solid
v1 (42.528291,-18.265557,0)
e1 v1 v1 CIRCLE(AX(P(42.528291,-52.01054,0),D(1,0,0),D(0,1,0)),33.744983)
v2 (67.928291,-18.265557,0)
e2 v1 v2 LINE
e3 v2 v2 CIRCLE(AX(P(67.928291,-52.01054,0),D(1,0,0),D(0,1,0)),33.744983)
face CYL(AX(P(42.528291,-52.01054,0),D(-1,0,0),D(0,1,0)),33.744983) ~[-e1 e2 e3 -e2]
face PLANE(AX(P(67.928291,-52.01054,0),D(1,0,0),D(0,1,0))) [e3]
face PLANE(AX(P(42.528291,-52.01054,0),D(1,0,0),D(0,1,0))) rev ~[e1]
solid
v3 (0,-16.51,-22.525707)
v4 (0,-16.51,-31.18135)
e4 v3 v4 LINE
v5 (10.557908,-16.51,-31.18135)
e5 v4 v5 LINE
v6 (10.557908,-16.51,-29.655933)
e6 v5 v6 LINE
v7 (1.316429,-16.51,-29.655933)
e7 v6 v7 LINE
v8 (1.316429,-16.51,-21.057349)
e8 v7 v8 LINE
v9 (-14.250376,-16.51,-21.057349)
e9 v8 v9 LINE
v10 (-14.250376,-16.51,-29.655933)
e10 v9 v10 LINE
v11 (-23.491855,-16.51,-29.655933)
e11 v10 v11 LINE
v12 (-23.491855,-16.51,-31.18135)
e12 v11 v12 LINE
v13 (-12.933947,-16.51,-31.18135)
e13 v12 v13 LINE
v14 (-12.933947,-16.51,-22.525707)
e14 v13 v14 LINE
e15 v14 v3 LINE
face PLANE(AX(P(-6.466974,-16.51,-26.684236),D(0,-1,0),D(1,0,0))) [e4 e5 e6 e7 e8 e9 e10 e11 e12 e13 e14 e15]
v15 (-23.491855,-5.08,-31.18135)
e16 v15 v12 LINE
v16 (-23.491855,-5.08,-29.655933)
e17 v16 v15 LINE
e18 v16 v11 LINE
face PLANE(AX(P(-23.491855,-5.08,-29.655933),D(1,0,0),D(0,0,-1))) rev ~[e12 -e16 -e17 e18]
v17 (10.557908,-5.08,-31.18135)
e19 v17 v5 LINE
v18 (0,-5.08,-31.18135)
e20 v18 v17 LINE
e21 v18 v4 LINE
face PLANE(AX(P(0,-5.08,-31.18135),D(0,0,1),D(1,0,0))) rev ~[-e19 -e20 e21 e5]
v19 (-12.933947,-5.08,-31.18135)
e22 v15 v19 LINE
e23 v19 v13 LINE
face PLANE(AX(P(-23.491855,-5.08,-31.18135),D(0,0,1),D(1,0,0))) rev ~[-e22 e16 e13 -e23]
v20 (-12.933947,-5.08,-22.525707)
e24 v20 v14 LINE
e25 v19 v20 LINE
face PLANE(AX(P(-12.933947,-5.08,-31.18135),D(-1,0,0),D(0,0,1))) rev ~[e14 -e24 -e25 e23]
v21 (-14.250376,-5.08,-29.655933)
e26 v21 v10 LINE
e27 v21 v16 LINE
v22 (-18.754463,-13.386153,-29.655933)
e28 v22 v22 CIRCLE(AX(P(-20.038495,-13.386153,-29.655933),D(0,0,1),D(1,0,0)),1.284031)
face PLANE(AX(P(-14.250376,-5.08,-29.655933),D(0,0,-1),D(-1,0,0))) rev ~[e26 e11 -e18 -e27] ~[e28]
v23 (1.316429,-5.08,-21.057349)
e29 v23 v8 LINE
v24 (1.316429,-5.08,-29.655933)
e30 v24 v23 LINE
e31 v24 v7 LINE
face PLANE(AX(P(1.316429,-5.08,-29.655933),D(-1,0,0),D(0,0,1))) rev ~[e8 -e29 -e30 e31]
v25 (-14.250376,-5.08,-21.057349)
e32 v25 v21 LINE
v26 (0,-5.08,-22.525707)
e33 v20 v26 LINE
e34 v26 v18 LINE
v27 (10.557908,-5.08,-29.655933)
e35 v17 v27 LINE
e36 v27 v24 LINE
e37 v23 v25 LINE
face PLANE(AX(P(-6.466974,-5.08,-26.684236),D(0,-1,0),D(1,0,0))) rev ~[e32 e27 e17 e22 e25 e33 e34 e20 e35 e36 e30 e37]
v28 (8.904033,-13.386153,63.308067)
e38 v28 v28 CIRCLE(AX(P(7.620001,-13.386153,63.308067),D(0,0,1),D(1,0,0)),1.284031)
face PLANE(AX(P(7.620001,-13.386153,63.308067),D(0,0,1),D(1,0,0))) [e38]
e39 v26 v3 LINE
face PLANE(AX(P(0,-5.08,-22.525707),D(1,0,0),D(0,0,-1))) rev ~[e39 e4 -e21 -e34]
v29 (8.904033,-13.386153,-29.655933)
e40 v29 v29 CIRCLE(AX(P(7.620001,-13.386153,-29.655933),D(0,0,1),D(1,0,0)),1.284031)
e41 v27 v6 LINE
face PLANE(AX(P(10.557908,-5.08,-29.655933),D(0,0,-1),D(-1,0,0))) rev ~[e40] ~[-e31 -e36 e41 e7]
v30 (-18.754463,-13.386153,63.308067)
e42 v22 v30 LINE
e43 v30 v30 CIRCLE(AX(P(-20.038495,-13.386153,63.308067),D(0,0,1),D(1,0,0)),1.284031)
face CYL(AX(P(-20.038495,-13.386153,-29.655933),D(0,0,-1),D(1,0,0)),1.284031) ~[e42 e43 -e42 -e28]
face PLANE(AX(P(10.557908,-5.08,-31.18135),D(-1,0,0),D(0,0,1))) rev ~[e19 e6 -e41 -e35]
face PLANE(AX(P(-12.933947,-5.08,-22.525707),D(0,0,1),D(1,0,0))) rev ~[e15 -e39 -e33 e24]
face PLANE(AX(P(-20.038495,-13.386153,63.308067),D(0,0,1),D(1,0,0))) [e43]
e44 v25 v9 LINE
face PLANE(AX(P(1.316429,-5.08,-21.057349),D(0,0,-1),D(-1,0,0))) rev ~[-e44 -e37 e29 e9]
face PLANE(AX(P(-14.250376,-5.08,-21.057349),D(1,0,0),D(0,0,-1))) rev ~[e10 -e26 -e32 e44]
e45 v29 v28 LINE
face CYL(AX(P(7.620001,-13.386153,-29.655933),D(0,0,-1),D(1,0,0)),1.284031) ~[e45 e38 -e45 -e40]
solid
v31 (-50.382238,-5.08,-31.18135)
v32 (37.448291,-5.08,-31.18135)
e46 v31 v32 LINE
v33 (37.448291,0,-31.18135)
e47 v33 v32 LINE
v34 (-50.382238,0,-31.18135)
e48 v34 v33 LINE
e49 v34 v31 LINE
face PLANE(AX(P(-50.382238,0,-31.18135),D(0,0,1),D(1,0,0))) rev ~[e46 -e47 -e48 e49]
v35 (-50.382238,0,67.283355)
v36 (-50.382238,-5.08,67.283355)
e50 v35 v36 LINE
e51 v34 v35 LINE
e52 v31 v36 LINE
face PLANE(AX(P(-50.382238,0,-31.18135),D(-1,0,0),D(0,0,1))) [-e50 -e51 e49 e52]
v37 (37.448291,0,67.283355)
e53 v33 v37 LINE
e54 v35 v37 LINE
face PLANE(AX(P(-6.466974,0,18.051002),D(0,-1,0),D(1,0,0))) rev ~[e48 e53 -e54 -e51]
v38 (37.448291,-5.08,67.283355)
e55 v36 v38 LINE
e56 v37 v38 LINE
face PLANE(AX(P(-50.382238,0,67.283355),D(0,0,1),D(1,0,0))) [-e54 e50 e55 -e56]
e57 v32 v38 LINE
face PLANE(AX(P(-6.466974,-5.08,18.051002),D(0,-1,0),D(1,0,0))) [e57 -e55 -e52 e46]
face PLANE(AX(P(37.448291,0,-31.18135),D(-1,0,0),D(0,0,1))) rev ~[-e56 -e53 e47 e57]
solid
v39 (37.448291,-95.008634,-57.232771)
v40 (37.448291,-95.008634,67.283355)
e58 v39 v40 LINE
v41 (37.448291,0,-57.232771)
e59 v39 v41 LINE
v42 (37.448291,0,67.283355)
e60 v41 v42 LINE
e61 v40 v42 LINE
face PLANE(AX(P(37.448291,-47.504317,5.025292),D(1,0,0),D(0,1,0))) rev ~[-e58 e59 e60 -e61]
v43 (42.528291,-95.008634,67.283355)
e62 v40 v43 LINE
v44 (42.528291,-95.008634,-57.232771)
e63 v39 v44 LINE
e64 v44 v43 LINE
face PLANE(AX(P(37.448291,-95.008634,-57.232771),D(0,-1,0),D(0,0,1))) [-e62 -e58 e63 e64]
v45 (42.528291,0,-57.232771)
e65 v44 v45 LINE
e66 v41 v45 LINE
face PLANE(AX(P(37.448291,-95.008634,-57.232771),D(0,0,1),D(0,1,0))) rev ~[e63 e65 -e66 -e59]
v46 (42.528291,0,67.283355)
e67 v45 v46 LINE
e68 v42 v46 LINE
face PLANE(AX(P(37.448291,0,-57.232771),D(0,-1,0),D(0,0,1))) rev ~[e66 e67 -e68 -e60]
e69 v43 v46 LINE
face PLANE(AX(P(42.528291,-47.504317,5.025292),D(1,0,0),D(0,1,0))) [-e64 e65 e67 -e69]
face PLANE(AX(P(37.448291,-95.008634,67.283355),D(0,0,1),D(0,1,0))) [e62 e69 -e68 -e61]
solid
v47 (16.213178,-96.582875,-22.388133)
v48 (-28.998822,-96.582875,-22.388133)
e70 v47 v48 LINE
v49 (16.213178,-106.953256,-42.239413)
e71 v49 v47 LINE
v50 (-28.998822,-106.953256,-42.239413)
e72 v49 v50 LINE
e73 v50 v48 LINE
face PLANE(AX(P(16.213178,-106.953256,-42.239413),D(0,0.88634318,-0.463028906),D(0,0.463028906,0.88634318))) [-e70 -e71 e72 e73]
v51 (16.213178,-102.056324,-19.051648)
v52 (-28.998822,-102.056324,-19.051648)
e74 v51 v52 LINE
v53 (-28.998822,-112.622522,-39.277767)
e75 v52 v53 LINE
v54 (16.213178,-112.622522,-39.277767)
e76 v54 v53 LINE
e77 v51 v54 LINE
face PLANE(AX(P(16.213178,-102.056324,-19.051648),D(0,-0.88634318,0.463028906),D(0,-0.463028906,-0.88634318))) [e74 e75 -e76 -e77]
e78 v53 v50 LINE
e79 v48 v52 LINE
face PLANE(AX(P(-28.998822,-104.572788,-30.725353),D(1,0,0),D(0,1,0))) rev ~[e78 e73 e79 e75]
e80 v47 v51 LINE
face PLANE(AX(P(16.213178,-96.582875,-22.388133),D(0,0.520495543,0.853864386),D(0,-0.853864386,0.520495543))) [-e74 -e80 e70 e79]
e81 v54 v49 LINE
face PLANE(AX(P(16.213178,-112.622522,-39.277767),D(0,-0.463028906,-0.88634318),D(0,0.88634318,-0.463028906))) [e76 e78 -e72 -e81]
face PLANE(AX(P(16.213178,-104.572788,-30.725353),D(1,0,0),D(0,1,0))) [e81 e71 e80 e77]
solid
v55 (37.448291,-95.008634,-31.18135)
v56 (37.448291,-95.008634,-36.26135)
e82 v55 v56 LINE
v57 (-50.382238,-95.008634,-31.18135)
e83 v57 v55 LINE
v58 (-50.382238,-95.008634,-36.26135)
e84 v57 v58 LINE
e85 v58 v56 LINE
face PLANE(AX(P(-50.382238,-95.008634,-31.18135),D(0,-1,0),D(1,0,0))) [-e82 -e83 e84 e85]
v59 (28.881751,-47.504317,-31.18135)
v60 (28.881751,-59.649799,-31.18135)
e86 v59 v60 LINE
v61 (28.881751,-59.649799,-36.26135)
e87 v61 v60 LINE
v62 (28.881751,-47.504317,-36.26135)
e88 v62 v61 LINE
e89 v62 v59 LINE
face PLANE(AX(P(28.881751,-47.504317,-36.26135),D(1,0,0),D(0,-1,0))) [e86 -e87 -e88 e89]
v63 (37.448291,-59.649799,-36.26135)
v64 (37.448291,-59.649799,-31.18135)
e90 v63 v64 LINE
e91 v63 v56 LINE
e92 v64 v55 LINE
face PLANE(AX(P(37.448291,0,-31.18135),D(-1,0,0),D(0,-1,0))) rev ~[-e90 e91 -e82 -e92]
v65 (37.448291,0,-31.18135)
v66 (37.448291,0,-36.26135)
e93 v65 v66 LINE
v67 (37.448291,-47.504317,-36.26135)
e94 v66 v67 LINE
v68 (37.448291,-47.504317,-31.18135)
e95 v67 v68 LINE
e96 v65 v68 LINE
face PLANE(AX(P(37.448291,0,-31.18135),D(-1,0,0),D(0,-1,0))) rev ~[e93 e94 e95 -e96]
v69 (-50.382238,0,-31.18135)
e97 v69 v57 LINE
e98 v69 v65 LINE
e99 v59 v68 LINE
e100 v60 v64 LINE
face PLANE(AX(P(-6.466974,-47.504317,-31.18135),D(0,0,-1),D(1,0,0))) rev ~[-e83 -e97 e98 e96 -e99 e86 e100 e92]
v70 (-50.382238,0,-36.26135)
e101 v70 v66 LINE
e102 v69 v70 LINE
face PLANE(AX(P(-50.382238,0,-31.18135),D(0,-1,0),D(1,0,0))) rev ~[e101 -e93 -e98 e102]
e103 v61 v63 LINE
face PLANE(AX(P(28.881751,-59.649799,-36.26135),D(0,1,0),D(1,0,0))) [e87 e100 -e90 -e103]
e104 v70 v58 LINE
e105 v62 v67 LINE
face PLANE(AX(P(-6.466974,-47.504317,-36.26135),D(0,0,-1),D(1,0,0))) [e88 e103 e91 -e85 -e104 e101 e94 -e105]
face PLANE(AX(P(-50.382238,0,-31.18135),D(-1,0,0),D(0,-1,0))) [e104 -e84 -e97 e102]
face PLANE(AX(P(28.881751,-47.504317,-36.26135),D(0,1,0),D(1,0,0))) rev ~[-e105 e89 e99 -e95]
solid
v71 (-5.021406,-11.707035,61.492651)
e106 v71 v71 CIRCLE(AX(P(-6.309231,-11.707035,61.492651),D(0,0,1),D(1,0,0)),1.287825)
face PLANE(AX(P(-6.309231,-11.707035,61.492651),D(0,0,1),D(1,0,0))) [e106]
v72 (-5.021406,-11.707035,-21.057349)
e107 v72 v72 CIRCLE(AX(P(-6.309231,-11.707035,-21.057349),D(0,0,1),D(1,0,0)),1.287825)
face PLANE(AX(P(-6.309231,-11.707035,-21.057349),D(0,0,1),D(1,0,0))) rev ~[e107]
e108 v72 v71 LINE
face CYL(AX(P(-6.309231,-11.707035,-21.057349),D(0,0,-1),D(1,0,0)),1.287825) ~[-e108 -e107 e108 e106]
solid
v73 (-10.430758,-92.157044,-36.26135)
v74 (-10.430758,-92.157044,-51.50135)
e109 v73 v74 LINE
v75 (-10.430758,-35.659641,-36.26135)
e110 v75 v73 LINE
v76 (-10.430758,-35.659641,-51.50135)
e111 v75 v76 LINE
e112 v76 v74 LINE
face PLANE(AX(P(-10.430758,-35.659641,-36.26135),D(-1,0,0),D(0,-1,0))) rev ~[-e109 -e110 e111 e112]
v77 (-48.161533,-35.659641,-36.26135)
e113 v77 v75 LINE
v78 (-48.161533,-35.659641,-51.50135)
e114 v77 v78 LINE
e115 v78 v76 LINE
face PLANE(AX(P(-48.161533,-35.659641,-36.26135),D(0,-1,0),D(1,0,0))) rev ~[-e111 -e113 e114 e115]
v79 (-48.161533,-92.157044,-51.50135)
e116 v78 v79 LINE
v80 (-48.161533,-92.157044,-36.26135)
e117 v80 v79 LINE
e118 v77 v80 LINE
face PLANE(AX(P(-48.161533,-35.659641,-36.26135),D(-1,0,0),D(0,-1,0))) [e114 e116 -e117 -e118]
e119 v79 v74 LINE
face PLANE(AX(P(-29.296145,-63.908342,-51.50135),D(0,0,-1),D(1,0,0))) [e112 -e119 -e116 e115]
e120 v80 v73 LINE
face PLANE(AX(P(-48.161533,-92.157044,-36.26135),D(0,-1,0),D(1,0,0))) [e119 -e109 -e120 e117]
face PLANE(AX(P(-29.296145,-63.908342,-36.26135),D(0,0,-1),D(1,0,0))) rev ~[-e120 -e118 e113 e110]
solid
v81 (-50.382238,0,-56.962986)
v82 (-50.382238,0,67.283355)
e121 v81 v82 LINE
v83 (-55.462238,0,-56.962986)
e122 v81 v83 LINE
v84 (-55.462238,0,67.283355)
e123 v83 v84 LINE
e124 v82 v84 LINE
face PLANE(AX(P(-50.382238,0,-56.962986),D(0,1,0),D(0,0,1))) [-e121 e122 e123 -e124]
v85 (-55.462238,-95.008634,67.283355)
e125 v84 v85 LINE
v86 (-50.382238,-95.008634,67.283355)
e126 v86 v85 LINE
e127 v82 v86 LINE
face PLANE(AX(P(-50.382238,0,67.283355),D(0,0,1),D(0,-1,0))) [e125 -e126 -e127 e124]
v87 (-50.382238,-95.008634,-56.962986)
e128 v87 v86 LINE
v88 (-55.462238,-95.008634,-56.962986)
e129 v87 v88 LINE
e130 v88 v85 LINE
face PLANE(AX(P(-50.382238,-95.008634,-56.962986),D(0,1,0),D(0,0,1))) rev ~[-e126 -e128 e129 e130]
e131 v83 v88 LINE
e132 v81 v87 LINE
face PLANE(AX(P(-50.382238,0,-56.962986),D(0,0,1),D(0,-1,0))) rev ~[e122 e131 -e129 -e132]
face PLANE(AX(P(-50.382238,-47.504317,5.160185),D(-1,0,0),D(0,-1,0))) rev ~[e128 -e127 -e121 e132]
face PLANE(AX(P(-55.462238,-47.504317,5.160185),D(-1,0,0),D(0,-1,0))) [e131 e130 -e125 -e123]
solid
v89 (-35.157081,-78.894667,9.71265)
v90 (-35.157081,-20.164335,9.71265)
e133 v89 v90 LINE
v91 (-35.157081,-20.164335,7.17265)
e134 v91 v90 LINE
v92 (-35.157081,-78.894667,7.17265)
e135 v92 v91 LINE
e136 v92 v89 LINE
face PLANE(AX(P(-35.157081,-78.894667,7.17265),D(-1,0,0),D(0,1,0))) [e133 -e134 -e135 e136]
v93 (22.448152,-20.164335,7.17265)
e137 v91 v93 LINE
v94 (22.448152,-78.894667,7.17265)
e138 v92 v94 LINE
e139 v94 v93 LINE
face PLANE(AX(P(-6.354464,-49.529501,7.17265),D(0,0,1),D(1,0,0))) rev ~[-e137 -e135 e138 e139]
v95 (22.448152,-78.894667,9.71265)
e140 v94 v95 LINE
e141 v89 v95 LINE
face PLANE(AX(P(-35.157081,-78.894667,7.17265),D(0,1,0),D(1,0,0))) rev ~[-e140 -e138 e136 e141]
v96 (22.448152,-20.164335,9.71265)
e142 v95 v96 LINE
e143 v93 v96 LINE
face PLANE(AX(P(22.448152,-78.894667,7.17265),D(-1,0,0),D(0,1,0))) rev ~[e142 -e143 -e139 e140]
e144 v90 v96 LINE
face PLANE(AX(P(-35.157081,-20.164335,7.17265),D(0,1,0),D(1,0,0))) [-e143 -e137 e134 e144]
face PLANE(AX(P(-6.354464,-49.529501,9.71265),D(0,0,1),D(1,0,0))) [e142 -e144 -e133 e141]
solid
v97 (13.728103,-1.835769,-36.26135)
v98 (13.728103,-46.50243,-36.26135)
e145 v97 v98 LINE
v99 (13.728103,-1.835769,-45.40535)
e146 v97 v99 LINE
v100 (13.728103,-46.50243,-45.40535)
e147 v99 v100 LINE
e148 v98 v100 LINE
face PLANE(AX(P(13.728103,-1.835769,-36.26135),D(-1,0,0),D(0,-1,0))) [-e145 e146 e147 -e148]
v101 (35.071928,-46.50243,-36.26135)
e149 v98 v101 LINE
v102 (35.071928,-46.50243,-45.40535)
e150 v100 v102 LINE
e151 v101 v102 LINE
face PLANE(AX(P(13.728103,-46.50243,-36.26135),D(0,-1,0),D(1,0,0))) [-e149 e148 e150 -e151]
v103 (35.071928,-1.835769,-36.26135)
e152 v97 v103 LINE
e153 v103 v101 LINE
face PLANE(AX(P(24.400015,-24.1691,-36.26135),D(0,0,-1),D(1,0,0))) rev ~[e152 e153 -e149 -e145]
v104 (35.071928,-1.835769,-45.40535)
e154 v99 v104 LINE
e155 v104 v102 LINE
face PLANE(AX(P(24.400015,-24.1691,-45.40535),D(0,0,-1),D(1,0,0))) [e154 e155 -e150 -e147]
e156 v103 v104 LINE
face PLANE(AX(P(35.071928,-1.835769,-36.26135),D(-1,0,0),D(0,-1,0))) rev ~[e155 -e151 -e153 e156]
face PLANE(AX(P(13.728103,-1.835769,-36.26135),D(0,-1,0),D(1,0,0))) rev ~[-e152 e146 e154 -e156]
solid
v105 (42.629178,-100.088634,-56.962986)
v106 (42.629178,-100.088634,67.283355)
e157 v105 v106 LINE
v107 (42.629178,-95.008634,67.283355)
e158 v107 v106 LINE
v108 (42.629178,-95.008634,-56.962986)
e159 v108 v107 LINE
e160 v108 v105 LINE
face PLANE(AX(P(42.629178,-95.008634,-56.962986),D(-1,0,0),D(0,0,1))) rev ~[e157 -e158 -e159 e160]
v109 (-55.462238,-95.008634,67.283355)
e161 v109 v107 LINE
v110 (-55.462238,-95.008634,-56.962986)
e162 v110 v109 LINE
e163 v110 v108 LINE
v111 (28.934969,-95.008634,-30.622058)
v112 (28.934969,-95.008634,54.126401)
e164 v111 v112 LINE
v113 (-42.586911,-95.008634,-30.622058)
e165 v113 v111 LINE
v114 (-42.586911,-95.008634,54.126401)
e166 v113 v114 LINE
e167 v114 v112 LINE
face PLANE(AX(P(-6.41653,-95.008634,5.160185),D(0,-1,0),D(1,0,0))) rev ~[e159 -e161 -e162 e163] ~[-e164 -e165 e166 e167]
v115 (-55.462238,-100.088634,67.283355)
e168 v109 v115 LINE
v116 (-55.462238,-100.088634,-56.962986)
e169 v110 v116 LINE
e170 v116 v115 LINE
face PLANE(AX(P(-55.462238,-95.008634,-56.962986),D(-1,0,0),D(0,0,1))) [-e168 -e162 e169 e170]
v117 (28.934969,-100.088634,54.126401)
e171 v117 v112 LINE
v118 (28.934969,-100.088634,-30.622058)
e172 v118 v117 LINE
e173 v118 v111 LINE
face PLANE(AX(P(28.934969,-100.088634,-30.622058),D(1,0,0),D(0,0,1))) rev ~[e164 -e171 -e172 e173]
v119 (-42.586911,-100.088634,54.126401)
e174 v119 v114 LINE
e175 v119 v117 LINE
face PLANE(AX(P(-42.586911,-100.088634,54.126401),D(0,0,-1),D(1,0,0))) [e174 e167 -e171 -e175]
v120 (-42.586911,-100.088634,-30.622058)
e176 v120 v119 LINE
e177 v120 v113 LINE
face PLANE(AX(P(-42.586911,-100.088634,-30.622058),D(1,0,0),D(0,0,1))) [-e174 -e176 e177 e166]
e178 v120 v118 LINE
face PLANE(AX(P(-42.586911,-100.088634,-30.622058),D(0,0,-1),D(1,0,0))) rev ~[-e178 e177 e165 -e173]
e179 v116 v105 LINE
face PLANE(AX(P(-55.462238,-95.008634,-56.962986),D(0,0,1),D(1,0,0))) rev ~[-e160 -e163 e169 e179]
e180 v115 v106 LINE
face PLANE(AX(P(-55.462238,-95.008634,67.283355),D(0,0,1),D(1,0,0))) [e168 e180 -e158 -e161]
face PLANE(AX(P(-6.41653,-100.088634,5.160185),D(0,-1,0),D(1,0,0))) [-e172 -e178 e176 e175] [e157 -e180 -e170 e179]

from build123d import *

# Parameters (mm, degrees)
F0_W      = 87.8305286169
F0_H      = 98.46470505
F1_DEPTH  = 5.08
F2_W      = 87.8305286169
F2_H      = 95.0086340308
F3_DEPTH  = 5.08
F4_W      = 95.0086340308
F4_H      = 124.5161257684
F5_DEPTH  = 5.08
F6_W      = 95.0086340308
F6_H      = 124.246340245
F7_DEPTH  = 5.08
F8_W      = 98.0914154202
F8_H      = 124.246340245
F9_DEPTH  = 5.08
F10_W     = 71.5218801051
F10_H     = 84.7484581172
F11_DEPTH = 25.4
F13_DEPTH = 11.43
F15_R     = 1.2840313407
F16_DEPTH = 92.964
F14_R     = 1.287825451
F17_DEPTH = 82.55
F18_W     = 37.7307755407
F18_H     = 56.4974024892
F19_DEPTH = 15.24
F20_W     = 21.343825385
F20_H     = 44.6666606003
F21_DEPTH = 9.144
F22_W     = 8.5665397346
F22_H     = 12.1454820037
F23_DEPTH = 25.4
F25_W     = 57.6052330434
F25_H     = 58.7303321809
F26_DEPTH = 2.54
F29_DEPTH = 45.212
F30_R     = 33.7449831522
F31_DEPTH = 25.4


with BuildPart() as f1:
    # F0 (on Front) → F1 (new body)
    with BuildSketch(Plane.XZ):
        with Locations((-6.466973573, 18.0510021746)):
            Rectangle(F0_W, F0_H)
    extrude(amount=F1_DEPTH)


with BuildPart() as f3:
    # F2 (on face) → F3 (new body)
    with BuildSketch(Plane(origin=(0, 0, -31.1813503504), x_dir=(1, 0, 0), z_dir=(0, 0, -1))):
        with Locations((-6.466973573, 47.5043170154)):
            Rectangle(F2_W, F2_H)
    extrude(amount=F3_DEPTH)

    # F22 (on face) → F23 (cut)
    with BuildSketch(Plane(origin=(0, 0, -36.2613503504), x_dir=(1, 0, 0), z_dir=(0, 0, -1))):
        with Locations((33.1650208682, 53.5770580173)):
            Rectangle(F22_W, F22_H)
    extrude(amount=-F23_DEPTH, mode=Mode.SUBTRACT)


with BuildPart() as f5:
    # F4 (on face) → F5 (new body)
    with BuildSketch(Plane.YZ.offset(37.4482907355)):
        with Locations((-47.5043170154, 5.0252918154)):
            Rectangle(F4_W, F4_H)
    extrude(amount=F5_DEPTH)


with BuildPart() as f7:
    # F6 (on face) → F7 (new body)
    with BuildSketch(Plane(origin=(-50.3822378814, 0, 0), x_dir=(0, -1, 0), z_dir=(-1, 0, 0))):
        with Locations((47.5043170154, 5.1601845771)):
            Rectangle(F6_W, F6_H)
    extrude(amount=F7_DEPTH)


with BuildPart() as f9:
    # F8 (on face) → F9 (new body)
    with BuildSketch(Plane.XZ.offset(95.0086340308)):
        with Locations((-6.4165301713, 5.1601845771)):
            Rectangle(F8_W, F8_H)
    extrude(amount=F9_DEPTH)

    # F10 (on face) → F11 (cut)
    with BuildSketch(Plane.XZ.offset(100.0886340308)):
        with Locations((-6.8259714171, 11.7521714419)):
            Rectangle(F10_W, F10_H)
    extrude(amount=-F11_DEPTH, mode=Mode.SUBTRACT)


with BuildPart() as f13:
    # F12 (on face) → F13 (new body)
    with BuildSketch(Plane.XZ.offset(5.08)):
        Polygon((-12.9339471459, -22.5257072598), (-6.466973573, -22.5257072598), (0, -22.5257072598), (0, -31.1813503504), (10.5579076335, -31.1813503504), (10.5579076335, -29.6559333801), (1.3164286502, -29.6559333801), (1.3164286502, -21.0573486984), (-6.466973573, -21.0573486984), (-14.2503757961, -21.0573486984), (-14.2503757961, -29.6559333801), (-23.4918547794, -29.6559333801), (-23.4918547794, -31.1813503504), (-12.9339471459, -31.1813503504), align=None)
    extrude(amount=F13_DEPTH)

    # F15 (on face) → F16 (join)
    with BuildSketch(Plane.XY.offset(-29.6559333801)):
        with Locations((-20.0384948403, -13.3861526847)):
            Circle(F15_R)
        with Locations((7.6200012118, -13.3861526847)):
            Circle(F15_R)
    extrude(amount=F16_DEPTH)


with BuildPart() as f17:
    # F14 (on face) → F17 (new body)
    with BuildSketch(Plane.XY.offset(-21.0573486984)):
        with Locations((-6.3092312776, -11.7070348933)):
            Circle(F14_R)
    extrude(amount=F17_DEPTH)


with BuildPart() as f19:
    # F18 (on face) → F19 (new body)
    with BuildSketch(Plane(origin=(0, 0, -36.2613503504), x_dir=(1, 0, 0), z_dir=(0, 0, -1))):
        with Locations((-29.2961454252, 63.908342272)):
            Rectangle(F18_W, F18_H)
    extrude(amount=F19_DEPTH)


with BuildPart() as f21:
    # F20 (on face) → F21 (new body)
    with BuildSketch(Plane(origin=(0, 0, -36.2613503504), x_dir=(1, 0, 0), z_dir=(0, 0, -1))):
        with Locations((24.4000153616, 24.1690996918)):
            Rectangle(F20_W, F20_H)
    extrude(amount=F21_DEPTH)


with BuildPart() as f26:
    # F25 (on offset) → F26 (new body)
    with BuildSketch(Plane.XY.offset(7.1726496496)):
        with Locations((-6.354464218, -49.529501237)):
            Rectangle(F25_W, F25_H)
    extrude(amount=F26_DEPTH)


with BuildPart() as f29:
    # F28 (on offset) → F29 (new body)
    with BuildSketch(Plane.YZ.offset(16.2131775388)):
        Polygon((-106.9532558322, -42.2394126654), (-96.5828751117, -22.3881331654), (-102.0563237106, -19.0516483007), (-112.6225219896, -39.277767374), align=None)
    extrude(amount=-F29_DEPTH)


with BuildPart() as f31:
    # F30 (on face) → F31 (new body)
    with BuildSketch(Plane.YZ.offset(42.5282907355)):
        with Locations((-52.0105399191, 0)):
            Circle(F30_R)
    extrude(amount=F31_DEPTH)


solid = Compound([f1.part, f3.part, f5.part, f7.part, f9.part, f13.part, f17.part, f19.part, f21.part, f26.part, f29.part, f31.part])
